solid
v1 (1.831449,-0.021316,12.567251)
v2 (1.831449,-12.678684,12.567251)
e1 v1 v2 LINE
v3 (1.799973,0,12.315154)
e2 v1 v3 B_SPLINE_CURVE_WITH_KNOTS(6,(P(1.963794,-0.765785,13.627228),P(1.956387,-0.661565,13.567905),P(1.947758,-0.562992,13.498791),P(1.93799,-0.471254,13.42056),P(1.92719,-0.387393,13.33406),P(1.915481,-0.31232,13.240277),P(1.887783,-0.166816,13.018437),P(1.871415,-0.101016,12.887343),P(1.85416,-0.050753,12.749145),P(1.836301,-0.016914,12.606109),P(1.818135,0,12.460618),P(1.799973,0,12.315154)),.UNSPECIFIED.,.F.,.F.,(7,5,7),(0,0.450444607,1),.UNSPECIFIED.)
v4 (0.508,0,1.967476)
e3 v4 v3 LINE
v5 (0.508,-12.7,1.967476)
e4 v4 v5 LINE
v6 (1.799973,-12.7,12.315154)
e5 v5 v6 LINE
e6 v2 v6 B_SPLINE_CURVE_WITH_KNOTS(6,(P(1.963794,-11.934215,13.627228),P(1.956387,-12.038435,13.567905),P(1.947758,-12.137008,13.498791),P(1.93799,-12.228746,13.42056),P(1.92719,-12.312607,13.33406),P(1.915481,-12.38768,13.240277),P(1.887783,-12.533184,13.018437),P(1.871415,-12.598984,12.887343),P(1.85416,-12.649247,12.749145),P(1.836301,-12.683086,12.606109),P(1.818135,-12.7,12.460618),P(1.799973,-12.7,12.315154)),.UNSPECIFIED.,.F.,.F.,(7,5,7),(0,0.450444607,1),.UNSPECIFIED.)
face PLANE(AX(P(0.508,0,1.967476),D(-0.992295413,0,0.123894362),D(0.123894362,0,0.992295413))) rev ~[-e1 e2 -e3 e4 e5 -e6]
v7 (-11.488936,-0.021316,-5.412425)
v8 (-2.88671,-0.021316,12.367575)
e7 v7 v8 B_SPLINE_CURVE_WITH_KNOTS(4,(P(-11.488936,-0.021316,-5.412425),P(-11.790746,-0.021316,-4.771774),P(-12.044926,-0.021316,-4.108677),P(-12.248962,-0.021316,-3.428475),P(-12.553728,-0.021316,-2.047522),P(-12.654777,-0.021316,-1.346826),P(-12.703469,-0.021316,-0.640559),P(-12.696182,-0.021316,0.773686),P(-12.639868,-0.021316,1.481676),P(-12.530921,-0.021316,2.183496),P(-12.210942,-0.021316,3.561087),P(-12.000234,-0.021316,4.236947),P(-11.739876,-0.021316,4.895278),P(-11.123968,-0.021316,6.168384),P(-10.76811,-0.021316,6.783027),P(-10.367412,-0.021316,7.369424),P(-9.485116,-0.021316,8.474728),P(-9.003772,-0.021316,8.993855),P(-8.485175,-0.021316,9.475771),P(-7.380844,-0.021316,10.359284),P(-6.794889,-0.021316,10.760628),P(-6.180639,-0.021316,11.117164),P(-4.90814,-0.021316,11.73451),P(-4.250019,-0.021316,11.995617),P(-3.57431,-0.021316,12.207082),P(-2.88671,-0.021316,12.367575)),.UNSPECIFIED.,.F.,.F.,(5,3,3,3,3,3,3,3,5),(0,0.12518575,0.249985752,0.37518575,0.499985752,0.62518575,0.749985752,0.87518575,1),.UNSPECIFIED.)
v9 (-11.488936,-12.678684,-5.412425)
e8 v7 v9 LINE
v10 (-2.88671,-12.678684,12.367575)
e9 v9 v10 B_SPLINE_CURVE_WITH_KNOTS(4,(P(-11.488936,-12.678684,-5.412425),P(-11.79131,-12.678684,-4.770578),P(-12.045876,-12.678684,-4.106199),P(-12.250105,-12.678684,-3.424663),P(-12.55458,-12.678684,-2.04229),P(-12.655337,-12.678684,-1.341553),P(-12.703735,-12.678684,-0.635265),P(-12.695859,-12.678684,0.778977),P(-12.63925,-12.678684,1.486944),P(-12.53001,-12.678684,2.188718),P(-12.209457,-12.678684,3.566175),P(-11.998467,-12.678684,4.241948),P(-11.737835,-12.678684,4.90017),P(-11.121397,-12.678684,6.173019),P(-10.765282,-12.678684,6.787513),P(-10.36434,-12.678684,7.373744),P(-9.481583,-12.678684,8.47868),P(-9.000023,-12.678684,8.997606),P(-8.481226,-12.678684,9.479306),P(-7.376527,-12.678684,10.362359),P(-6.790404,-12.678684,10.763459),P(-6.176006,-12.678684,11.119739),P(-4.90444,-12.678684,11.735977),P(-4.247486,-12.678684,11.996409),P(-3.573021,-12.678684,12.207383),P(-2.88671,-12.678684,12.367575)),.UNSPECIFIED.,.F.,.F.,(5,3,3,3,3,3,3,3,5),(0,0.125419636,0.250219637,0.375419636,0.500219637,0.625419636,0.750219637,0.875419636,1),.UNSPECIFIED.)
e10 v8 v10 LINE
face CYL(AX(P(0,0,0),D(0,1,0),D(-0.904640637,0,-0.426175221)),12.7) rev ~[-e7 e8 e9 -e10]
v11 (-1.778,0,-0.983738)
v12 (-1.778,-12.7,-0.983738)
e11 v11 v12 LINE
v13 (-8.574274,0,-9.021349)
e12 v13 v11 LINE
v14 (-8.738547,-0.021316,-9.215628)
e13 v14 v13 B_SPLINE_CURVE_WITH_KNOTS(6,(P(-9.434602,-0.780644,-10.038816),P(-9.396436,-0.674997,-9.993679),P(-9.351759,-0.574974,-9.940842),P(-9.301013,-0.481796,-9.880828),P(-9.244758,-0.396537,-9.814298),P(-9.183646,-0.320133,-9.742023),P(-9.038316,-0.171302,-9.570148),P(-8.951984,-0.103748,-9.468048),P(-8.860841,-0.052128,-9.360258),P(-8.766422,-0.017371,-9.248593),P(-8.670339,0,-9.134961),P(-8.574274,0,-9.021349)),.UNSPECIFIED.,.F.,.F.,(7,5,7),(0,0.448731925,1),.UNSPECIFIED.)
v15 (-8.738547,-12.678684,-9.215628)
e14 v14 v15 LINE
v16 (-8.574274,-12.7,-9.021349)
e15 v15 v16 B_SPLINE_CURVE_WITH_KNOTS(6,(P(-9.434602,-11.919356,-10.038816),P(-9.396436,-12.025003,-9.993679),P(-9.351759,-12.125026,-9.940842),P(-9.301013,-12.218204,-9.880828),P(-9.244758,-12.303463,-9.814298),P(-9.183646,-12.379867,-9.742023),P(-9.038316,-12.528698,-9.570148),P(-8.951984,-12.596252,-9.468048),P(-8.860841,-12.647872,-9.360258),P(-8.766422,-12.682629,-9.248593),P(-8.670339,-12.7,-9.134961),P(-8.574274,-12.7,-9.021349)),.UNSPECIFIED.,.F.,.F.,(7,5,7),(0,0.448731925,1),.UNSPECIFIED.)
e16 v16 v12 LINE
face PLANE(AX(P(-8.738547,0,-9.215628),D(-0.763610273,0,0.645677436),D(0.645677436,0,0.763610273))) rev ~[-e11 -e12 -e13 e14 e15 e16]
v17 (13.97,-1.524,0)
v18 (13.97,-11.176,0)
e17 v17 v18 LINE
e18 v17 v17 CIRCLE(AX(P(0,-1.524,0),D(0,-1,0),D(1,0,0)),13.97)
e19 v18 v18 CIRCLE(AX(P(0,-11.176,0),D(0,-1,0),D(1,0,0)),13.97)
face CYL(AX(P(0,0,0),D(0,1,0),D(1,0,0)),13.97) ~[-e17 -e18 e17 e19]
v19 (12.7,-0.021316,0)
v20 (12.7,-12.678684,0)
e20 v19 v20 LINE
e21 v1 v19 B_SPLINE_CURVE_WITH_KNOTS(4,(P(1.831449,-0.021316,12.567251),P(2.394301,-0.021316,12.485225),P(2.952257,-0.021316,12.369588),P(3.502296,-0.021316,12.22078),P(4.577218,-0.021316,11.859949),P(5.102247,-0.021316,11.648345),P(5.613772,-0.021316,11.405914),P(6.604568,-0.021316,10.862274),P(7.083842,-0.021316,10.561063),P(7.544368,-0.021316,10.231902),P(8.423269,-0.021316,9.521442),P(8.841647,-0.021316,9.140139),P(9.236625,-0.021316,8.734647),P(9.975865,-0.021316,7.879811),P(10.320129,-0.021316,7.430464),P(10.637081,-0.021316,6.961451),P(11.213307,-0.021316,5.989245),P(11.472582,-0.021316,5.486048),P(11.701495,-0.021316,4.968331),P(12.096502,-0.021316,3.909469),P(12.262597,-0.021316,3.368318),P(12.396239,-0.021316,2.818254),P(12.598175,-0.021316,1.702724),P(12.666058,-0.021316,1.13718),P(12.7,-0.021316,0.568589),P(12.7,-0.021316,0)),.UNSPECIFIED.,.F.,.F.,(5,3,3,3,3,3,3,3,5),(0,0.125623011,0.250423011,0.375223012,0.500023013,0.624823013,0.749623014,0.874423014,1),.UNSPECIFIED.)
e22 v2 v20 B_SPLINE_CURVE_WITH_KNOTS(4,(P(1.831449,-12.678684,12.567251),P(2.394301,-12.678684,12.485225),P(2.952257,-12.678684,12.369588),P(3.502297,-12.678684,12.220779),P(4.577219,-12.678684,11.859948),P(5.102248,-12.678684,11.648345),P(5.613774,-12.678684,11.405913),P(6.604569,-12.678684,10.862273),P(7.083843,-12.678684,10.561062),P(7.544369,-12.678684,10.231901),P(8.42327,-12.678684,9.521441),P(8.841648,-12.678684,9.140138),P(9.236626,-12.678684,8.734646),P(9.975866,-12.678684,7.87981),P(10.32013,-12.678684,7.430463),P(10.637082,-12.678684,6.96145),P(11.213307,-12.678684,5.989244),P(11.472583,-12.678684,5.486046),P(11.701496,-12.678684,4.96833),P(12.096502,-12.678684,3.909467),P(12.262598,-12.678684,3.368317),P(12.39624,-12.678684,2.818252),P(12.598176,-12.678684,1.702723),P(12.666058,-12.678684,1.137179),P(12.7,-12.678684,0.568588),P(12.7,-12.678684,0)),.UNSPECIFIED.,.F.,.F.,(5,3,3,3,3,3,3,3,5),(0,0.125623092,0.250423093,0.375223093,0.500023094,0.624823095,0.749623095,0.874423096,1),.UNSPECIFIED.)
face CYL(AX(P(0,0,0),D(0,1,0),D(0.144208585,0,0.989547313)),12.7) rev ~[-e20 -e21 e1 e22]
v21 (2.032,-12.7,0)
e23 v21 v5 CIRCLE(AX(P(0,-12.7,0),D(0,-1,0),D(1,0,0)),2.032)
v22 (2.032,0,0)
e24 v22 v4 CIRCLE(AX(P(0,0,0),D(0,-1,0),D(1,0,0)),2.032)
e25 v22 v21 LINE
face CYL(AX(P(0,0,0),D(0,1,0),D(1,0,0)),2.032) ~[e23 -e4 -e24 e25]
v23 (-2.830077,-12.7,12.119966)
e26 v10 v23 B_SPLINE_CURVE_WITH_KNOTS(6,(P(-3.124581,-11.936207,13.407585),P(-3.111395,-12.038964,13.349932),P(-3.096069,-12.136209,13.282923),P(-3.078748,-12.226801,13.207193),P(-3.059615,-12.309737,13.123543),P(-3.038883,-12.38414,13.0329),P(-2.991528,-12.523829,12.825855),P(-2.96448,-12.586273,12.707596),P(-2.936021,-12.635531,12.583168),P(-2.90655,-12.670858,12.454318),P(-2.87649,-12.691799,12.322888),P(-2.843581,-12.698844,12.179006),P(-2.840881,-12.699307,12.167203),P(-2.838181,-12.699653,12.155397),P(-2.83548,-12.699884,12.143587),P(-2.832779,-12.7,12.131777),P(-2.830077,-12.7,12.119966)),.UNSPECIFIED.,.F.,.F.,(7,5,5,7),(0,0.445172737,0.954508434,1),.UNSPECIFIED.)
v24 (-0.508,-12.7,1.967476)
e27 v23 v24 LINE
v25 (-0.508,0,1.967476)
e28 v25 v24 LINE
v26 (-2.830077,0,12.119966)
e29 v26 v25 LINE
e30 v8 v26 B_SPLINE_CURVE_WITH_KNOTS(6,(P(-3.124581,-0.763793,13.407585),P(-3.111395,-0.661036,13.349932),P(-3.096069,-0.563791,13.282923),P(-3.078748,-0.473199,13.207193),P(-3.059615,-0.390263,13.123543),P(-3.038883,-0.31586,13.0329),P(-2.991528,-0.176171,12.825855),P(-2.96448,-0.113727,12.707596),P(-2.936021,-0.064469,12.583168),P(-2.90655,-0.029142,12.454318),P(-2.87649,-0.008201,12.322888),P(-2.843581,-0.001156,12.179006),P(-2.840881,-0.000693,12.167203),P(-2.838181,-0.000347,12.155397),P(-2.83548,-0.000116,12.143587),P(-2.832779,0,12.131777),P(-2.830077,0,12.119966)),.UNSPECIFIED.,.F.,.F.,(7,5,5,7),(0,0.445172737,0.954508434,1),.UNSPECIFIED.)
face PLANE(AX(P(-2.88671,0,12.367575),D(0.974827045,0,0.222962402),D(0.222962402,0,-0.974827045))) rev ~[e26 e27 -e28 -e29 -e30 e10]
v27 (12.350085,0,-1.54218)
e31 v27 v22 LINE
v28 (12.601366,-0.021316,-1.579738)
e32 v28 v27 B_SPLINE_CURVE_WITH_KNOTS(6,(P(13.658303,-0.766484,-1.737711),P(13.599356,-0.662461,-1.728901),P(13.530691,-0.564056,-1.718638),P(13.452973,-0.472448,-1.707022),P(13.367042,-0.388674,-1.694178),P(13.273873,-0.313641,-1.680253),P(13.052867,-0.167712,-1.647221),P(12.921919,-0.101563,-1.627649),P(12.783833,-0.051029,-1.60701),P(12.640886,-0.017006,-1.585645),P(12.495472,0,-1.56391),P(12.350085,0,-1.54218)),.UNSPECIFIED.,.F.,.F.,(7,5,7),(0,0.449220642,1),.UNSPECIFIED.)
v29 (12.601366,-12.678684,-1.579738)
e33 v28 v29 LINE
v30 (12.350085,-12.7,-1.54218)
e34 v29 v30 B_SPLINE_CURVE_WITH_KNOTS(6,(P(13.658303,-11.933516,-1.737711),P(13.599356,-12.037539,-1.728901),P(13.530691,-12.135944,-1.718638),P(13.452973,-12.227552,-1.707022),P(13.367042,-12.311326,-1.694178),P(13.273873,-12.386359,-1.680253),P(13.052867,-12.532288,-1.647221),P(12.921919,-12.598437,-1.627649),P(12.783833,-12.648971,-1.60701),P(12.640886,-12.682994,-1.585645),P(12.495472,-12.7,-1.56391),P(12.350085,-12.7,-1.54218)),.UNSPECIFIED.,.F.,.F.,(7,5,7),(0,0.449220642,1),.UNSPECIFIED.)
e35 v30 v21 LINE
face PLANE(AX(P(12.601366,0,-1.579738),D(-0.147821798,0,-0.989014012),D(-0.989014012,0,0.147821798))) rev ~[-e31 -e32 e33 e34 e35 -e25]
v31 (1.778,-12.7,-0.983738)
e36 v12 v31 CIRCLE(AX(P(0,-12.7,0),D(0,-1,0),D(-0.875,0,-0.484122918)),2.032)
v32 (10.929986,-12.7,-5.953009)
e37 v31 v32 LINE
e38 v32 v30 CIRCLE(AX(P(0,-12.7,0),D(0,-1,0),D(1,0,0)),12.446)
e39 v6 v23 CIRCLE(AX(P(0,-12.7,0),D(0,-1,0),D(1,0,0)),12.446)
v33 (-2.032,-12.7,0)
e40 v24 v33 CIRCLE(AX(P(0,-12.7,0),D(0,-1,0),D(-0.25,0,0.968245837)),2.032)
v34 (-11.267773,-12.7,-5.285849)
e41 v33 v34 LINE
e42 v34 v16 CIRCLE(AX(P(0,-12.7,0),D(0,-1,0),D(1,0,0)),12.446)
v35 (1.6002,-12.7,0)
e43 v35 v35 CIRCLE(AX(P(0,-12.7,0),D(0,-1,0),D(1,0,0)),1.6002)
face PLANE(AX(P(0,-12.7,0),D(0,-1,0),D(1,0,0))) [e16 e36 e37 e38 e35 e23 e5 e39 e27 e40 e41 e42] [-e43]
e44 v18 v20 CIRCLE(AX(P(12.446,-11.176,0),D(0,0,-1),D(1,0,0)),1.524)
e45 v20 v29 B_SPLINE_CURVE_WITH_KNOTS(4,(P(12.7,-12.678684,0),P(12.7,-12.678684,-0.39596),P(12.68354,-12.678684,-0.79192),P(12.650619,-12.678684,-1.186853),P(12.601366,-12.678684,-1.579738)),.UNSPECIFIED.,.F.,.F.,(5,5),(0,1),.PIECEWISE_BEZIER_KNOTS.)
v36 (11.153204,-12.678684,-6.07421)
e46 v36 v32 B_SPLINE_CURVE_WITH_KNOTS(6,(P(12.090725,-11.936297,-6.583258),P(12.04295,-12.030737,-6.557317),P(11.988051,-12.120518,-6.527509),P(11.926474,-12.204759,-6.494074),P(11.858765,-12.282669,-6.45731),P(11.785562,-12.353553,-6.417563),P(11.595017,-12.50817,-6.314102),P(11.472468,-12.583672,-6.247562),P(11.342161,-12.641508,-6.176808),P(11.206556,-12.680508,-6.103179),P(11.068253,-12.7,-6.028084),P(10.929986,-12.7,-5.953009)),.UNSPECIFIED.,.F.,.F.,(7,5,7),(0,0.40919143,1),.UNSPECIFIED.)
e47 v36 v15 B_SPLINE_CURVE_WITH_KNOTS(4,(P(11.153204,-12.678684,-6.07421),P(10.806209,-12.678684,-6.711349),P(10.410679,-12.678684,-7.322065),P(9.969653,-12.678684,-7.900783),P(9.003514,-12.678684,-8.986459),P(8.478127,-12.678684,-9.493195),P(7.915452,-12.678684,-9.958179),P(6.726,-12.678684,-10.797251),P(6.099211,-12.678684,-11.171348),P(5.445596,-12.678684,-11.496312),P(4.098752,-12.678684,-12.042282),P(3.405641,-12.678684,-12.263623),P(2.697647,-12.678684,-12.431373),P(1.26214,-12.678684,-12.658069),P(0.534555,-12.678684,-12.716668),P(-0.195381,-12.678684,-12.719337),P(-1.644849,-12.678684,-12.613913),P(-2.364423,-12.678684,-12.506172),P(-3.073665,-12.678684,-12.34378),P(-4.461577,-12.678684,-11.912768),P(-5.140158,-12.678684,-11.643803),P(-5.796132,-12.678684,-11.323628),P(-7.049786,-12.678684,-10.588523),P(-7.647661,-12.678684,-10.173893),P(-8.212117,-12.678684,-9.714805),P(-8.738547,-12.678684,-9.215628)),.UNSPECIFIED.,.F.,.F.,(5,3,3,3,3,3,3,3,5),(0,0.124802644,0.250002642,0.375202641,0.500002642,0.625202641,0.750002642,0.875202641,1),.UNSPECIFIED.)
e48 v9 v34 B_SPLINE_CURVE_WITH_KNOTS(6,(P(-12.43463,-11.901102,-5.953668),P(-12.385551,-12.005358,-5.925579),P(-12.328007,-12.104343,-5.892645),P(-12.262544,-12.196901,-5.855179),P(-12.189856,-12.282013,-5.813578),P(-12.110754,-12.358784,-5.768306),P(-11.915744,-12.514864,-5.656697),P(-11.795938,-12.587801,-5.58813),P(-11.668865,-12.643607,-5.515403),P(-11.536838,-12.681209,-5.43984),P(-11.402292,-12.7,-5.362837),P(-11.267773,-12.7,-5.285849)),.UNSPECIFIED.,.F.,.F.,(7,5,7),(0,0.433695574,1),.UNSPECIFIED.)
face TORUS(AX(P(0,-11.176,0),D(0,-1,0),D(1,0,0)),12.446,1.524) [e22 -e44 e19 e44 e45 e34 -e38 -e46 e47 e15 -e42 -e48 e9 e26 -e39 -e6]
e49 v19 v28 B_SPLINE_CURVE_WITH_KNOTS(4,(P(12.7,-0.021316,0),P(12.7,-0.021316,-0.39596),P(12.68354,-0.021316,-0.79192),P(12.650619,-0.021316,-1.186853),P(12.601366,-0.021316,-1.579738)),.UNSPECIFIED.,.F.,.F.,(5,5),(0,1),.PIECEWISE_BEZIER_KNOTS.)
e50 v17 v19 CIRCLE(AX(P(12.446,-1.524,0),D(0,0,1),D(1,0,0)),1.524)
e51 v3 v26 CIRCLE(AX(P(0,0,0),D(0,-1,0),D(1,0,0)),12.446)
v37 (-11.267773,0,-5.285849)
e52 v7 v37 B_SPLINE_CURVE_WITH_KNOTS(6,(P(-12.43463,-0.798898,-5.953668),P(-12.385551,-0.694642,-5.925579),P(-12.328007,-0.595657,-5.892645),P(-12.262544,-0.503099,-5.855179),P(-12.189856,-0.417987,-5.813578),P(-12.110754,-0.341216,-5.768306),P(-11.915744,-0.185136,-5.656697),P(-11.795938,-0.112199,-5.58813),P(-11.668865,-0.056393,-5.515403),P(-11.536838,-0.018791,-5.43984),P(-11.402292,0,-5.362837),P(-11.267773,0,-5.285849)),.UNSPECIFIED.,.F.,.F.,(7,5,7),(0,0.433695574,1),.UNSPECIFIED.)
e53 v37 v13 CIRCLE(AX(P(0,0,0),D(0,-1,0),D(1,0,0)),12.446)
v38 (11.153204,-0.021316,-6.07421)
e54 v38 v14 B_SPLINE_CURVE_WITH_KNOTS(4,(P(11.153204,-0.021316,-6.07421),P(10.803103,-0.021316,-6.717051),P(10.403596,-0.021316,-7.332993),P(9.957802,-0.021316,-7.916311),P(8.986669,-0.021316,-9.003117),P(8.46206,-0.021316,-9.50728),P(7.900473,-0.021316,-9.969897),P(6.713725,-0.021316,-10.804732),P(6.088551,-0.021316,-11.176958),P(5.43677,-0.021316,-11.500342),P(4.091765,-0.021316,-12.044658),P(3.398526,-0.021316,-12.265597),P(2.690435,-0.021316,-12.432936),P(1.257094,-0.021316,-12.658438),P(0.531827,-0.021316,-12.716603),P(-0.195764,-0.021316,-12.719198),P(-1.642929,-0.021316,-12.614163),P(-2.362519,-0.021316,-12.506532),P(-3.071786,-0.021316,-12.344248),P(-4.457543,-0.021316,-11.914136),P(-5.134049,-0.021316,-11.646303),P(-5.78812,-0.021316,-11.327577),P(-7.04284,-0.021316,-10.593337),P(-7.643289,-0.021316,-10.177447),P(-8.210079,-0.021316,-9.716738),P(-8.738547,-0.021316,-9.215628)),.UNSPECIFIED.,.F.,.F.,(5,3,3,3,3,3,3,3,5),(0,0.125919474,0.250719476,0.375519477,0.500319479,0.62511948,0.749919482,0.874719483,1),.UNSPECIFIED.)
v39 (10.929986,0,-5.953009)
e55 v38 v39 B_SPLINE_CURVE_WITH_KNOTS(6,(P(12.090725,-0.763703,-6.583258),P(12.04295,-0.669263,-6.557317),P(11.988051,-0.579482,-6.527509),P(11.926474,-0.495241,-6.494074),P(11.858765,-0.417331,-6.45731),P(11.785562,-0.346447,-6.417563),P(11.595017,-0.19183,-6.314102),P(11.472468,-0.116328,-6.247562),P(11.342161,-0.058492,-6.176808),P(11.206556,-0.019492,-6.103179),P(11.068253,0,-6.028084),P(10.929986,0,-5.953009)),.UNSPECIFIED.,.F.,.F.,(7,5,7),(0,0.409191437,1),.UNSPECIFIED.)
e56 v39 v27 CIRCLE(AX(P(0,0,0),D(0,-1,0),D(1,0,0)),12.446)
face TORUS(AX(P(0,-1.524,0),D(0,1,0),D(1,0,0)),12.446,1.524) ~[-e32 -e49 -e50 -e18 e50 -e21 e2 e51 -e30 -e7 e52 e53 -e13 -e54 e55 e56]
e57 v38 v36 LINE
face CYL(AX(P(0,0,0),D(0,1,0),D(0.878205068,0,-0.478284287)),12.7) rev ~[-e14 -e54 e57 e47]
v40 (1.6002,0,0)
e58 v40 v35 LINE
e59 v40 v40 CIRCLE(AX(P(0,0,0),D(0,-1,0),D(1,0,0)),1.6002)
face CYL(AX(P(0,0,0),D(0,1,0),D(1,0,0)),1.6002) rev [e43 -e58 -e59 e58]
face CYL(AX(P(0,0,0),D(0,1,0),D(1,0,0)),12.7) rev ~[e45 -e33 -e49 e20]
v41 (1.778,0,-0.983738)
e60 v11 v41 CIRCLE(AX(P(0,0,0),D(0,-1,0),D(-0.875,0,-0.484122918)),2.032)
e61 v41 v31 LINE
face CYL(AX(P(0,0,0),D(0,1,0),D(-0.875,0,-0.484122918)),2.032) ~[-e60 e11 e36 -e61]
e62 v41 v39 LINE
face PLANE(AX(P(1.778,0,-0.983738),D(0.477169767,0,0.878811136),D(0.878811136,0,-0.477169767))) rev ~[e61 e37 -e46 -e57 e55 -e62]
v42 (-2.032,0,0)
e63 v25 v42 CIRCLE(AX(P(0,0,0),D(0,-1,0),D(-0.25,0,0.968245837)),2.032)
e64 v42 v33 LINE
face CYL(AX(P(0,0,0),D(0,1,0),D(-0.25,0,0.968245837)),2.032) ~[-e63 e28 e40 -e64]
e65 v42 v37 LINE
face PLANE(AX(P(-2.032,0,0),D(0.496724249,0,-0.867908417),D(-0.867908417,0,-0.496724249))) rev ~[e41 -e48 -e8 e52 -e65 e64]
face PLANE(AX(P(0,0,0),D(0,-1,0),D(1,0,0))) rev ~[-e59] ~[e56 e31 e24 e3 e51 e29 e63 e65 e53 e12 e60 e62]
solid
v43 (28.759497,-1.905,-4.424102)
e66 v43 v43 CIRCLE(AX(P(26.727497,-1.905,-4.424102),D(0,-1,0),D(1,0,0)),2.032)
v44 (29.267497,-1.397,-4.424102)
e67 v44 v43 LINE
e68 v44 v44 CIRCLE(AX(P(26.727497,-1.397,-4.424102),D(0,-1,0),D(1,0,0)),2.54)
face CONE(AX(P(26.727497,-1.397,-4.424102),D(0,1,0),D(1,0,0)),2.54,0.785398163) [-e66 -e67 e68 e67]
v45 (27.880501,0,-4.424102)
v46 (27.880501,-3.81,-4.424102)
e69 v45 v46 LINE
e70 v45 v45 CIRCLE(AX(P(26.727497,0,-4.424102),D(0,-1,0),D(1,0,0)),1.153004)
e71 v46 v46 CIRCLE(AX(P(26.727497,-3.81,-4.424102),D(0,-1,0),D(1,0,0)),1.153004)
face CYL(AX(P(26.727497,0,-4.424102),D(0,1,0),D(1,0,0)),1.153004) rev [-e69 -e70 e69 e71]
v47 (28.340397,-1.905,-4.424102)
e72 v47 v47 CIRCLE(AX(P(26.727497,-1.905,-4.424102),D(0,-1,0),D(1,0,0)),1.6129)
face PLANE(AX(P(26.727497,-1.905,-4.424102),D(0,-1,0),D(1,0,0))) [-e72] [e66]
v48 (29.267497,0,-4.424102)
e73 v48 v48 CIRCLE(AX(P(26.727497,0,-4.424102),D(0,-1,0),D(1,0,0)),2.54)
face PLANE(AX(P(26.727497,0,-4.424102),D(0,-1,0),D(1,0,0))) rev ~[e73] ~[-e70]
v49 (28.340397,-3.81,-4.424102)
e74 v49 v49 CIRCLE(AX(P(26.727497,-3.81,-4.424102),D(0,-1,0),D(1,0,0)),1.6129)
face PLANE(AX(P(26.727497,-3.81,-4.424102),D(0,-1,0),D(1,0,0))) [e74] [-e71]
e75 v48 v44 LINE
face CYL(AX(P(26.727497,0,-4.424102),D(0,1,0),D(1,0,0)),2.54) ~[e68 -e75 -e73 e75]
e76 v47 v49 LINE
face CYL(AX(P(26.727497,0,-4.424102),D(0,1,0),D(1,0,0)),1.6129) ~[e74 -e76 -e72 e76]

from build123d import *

# Parameters (mm, degrees)
F0_R     = 13.97
F0_R_2   = 1.6002
F1_DEPTH = 12.7
F3_R     = 1.6129
F3_R_2   = 1.1530042691
F4_DEPTH = 3.81
F3_R_3   = 2.54
F5_DEPTH = 1.905
F6_SIZE  = 0.508


# Not quite as in the source:
# - a fillet or chamfer that OpenCascade refuses, or shapes differently, is made with other operations: its cross-section is extruded or revolved along the edge and cut away or added


with BuildPart() as f1:
    # F0 (on Front) → F1 (new body)
    with BuildSketch(Plane.XZ):
        Circle(F0_R)
        with BuildLine():
            ThreePointArc((12.7, 0), (12.6753175523, -0.7914069427), (12.6013661498, -1.5797376868))
            ThreePointArc((12.6013661498, -1.5797376868), (12.0880096107, -3.894871455), (11.1532043579, -6.0742104466))
            ThreePointArc((11.1532043579, -6.0742104466), (1.9811025721, -12.5445299872), (-8.7385473465, -9.215627503))
            ThreePointArc((-8.7385473465, -9.215627503), (-10.2909600249, -7.4421866253), (-11.4889360845, -5.4124253016))
            ThreePointArc((-11.4889360845, -5.4124253016), (-11.4322745724, 5.5311027925), (-2.8867102521, 12.3675746984))
            ThreePointArc((-2.8867102521, 12.3675746984), (-0.5369932074, 12.6886420982), (1.8314490307, 12.5672508707))
            ThreePointArc((1.8314490307, 12.5672508707), (9.6059721707, 8.3075446827), (12.7, 0))
        make_face(mode=Mode.SUBTRACT)
        with BuildLine():
            ThreePointArc((1.778, -0.9837377699), (1.9674755399, -0.508), (2.032, 0))
            ThreePointArc((2.032, 0), (1.6064370514, 1.2443407893), (0.508, 1.9674755399))
            ThreePointArc((0.508, 1.9674755399), (0, 2.032), (-0.508, 1.9674755399))
            ThreePointArc((-0.508, 1.9674755399), (-1.6064370514, 1.2443407893), (-2.032, 0))
            ThreePointArc((-2.032, 0), (-1.9674755399, -0.508), (-1.778, -0.9837377699))
            ThreePointArc((-1.778, -0.9837377699), (0, -2.032), (1.778, -0.9837377699))
        make_face()
        Circle(F0_R_2, mode=Mode.SUBTRACT)
        with BuildLine():
            Line((-8.7385473465, -9.215627503), (-1.778, -0.9837377699))
            ThreePointArc((-1.778, -0.9837377699), (-1.9674755399, -0.508), (-2.032, 0))
            Line((-2.032, 0), (-11.4889360845, -5.4124253016))
            ThreePointArc((-11.4889360845, -5.4124253016), (-10.2909600249, -7.4421866253), (-8.7385473465, -9.215627503))
        make_face()
        with BuildLine():
            Line((12.6013661498, -1.5797376868), (2.032, 0))
            ThreePointArc((2.032, 0), (1.9674755399, -0.508), (1.778, -0.9837377699))
            Line((1.778, -0.9837377699), (11.1532043579, -6.0742104466))
            ThreePointArc((11.1532043579, -6.0742104466), (12.0880096107, -3.894871455), (12.6013661498, -1.5797376868))
        make_face()
        with BuildLine():
            ThreePointArc((-0.508, 1.9674755399), (0, 2.032), (0.508, 1.9674755399))
            Line((0.508, 1.9674755399), (1.8314490307, 12.5672508707))
            ThreePointArc((1.8314490307, 12.5672508707), (-0.5369932074, 12.6886420982), (-2.8867102521, 12.3675746984))
            Line((-2.8867102521, 12.3675746984), (-0.508, 1.9674755399))
        make_face()
    extrude(amount=F1_DEPTH)

    # F2: fillet of radius 1.524 on 2 edges, made by hand

    # F2_s1 → F2_t2 (revolve, cut)
    with BuildSketch(Plane.XY):
        with BuildLine():
            ThreePointArc((13.97, -11.176), (13.5236307345, -12.2536307345), (12.446, -12.7))
            Line((12.446, -12.7), (13.97, -12.7))
            Line((13.97, -12.7), (13.97, -11.176))
        make_face()
    revolve(axis=Axis((0, -12.7, 0), (0, -1, 0)), mode=Mode.SUBTRACT)

    # F2_s3 → F2_t4 (revolve, cut)
    with BuildSketch(Plane.XY):
        with BuildLine():
            ThreePointArc((13.97, -1.524), (13.5236307345, -0.4463692655), (12.446, 0))
            Line((12.446, 0), (13.97, 0))
            Line((13.97, 0), (13.97, -1.524))
        make_face()
    revolve(axis=Axis((0, 0, 0), (0, -1, 0)), mode=Mode.SUBTRACT)


with BuildPart() as f4:
    # F3 (on Front) → F4 (new body)
    with BuildSketch(Plane.XZ):
        with Locations((26.7274966631, -4.4241022947)):
            Circle(F3_R)
        with Locations((26.7274966631, -4.4241022947)):
            Circle(F3_R_2, mode=Mode.SUBTRACT)
    extrude(amount=F4_DEPTH)

    # F3 (on Front) → F5 (join)
    with BuildSketch(Plane.XZ):
        with Locations((26.7274966631, -4.4241022947)):
            Circle(F3_R_3)
        with Locations((26.7274966631, -4.4241022947)):
            Circle(F3_R, mode=Mode.SUBTRACT)
    extrude(amount=F5_DEPTH)

    # F6
    f6_edges = [f4.edges().sort_by_distance(p)[0] for p in [
        (24.187497, -1.905, -4.424102),
    ]]
    chamfer(f6_edges, length=F6_SIZE)


solid = Compound([f1.part, f4.part])
